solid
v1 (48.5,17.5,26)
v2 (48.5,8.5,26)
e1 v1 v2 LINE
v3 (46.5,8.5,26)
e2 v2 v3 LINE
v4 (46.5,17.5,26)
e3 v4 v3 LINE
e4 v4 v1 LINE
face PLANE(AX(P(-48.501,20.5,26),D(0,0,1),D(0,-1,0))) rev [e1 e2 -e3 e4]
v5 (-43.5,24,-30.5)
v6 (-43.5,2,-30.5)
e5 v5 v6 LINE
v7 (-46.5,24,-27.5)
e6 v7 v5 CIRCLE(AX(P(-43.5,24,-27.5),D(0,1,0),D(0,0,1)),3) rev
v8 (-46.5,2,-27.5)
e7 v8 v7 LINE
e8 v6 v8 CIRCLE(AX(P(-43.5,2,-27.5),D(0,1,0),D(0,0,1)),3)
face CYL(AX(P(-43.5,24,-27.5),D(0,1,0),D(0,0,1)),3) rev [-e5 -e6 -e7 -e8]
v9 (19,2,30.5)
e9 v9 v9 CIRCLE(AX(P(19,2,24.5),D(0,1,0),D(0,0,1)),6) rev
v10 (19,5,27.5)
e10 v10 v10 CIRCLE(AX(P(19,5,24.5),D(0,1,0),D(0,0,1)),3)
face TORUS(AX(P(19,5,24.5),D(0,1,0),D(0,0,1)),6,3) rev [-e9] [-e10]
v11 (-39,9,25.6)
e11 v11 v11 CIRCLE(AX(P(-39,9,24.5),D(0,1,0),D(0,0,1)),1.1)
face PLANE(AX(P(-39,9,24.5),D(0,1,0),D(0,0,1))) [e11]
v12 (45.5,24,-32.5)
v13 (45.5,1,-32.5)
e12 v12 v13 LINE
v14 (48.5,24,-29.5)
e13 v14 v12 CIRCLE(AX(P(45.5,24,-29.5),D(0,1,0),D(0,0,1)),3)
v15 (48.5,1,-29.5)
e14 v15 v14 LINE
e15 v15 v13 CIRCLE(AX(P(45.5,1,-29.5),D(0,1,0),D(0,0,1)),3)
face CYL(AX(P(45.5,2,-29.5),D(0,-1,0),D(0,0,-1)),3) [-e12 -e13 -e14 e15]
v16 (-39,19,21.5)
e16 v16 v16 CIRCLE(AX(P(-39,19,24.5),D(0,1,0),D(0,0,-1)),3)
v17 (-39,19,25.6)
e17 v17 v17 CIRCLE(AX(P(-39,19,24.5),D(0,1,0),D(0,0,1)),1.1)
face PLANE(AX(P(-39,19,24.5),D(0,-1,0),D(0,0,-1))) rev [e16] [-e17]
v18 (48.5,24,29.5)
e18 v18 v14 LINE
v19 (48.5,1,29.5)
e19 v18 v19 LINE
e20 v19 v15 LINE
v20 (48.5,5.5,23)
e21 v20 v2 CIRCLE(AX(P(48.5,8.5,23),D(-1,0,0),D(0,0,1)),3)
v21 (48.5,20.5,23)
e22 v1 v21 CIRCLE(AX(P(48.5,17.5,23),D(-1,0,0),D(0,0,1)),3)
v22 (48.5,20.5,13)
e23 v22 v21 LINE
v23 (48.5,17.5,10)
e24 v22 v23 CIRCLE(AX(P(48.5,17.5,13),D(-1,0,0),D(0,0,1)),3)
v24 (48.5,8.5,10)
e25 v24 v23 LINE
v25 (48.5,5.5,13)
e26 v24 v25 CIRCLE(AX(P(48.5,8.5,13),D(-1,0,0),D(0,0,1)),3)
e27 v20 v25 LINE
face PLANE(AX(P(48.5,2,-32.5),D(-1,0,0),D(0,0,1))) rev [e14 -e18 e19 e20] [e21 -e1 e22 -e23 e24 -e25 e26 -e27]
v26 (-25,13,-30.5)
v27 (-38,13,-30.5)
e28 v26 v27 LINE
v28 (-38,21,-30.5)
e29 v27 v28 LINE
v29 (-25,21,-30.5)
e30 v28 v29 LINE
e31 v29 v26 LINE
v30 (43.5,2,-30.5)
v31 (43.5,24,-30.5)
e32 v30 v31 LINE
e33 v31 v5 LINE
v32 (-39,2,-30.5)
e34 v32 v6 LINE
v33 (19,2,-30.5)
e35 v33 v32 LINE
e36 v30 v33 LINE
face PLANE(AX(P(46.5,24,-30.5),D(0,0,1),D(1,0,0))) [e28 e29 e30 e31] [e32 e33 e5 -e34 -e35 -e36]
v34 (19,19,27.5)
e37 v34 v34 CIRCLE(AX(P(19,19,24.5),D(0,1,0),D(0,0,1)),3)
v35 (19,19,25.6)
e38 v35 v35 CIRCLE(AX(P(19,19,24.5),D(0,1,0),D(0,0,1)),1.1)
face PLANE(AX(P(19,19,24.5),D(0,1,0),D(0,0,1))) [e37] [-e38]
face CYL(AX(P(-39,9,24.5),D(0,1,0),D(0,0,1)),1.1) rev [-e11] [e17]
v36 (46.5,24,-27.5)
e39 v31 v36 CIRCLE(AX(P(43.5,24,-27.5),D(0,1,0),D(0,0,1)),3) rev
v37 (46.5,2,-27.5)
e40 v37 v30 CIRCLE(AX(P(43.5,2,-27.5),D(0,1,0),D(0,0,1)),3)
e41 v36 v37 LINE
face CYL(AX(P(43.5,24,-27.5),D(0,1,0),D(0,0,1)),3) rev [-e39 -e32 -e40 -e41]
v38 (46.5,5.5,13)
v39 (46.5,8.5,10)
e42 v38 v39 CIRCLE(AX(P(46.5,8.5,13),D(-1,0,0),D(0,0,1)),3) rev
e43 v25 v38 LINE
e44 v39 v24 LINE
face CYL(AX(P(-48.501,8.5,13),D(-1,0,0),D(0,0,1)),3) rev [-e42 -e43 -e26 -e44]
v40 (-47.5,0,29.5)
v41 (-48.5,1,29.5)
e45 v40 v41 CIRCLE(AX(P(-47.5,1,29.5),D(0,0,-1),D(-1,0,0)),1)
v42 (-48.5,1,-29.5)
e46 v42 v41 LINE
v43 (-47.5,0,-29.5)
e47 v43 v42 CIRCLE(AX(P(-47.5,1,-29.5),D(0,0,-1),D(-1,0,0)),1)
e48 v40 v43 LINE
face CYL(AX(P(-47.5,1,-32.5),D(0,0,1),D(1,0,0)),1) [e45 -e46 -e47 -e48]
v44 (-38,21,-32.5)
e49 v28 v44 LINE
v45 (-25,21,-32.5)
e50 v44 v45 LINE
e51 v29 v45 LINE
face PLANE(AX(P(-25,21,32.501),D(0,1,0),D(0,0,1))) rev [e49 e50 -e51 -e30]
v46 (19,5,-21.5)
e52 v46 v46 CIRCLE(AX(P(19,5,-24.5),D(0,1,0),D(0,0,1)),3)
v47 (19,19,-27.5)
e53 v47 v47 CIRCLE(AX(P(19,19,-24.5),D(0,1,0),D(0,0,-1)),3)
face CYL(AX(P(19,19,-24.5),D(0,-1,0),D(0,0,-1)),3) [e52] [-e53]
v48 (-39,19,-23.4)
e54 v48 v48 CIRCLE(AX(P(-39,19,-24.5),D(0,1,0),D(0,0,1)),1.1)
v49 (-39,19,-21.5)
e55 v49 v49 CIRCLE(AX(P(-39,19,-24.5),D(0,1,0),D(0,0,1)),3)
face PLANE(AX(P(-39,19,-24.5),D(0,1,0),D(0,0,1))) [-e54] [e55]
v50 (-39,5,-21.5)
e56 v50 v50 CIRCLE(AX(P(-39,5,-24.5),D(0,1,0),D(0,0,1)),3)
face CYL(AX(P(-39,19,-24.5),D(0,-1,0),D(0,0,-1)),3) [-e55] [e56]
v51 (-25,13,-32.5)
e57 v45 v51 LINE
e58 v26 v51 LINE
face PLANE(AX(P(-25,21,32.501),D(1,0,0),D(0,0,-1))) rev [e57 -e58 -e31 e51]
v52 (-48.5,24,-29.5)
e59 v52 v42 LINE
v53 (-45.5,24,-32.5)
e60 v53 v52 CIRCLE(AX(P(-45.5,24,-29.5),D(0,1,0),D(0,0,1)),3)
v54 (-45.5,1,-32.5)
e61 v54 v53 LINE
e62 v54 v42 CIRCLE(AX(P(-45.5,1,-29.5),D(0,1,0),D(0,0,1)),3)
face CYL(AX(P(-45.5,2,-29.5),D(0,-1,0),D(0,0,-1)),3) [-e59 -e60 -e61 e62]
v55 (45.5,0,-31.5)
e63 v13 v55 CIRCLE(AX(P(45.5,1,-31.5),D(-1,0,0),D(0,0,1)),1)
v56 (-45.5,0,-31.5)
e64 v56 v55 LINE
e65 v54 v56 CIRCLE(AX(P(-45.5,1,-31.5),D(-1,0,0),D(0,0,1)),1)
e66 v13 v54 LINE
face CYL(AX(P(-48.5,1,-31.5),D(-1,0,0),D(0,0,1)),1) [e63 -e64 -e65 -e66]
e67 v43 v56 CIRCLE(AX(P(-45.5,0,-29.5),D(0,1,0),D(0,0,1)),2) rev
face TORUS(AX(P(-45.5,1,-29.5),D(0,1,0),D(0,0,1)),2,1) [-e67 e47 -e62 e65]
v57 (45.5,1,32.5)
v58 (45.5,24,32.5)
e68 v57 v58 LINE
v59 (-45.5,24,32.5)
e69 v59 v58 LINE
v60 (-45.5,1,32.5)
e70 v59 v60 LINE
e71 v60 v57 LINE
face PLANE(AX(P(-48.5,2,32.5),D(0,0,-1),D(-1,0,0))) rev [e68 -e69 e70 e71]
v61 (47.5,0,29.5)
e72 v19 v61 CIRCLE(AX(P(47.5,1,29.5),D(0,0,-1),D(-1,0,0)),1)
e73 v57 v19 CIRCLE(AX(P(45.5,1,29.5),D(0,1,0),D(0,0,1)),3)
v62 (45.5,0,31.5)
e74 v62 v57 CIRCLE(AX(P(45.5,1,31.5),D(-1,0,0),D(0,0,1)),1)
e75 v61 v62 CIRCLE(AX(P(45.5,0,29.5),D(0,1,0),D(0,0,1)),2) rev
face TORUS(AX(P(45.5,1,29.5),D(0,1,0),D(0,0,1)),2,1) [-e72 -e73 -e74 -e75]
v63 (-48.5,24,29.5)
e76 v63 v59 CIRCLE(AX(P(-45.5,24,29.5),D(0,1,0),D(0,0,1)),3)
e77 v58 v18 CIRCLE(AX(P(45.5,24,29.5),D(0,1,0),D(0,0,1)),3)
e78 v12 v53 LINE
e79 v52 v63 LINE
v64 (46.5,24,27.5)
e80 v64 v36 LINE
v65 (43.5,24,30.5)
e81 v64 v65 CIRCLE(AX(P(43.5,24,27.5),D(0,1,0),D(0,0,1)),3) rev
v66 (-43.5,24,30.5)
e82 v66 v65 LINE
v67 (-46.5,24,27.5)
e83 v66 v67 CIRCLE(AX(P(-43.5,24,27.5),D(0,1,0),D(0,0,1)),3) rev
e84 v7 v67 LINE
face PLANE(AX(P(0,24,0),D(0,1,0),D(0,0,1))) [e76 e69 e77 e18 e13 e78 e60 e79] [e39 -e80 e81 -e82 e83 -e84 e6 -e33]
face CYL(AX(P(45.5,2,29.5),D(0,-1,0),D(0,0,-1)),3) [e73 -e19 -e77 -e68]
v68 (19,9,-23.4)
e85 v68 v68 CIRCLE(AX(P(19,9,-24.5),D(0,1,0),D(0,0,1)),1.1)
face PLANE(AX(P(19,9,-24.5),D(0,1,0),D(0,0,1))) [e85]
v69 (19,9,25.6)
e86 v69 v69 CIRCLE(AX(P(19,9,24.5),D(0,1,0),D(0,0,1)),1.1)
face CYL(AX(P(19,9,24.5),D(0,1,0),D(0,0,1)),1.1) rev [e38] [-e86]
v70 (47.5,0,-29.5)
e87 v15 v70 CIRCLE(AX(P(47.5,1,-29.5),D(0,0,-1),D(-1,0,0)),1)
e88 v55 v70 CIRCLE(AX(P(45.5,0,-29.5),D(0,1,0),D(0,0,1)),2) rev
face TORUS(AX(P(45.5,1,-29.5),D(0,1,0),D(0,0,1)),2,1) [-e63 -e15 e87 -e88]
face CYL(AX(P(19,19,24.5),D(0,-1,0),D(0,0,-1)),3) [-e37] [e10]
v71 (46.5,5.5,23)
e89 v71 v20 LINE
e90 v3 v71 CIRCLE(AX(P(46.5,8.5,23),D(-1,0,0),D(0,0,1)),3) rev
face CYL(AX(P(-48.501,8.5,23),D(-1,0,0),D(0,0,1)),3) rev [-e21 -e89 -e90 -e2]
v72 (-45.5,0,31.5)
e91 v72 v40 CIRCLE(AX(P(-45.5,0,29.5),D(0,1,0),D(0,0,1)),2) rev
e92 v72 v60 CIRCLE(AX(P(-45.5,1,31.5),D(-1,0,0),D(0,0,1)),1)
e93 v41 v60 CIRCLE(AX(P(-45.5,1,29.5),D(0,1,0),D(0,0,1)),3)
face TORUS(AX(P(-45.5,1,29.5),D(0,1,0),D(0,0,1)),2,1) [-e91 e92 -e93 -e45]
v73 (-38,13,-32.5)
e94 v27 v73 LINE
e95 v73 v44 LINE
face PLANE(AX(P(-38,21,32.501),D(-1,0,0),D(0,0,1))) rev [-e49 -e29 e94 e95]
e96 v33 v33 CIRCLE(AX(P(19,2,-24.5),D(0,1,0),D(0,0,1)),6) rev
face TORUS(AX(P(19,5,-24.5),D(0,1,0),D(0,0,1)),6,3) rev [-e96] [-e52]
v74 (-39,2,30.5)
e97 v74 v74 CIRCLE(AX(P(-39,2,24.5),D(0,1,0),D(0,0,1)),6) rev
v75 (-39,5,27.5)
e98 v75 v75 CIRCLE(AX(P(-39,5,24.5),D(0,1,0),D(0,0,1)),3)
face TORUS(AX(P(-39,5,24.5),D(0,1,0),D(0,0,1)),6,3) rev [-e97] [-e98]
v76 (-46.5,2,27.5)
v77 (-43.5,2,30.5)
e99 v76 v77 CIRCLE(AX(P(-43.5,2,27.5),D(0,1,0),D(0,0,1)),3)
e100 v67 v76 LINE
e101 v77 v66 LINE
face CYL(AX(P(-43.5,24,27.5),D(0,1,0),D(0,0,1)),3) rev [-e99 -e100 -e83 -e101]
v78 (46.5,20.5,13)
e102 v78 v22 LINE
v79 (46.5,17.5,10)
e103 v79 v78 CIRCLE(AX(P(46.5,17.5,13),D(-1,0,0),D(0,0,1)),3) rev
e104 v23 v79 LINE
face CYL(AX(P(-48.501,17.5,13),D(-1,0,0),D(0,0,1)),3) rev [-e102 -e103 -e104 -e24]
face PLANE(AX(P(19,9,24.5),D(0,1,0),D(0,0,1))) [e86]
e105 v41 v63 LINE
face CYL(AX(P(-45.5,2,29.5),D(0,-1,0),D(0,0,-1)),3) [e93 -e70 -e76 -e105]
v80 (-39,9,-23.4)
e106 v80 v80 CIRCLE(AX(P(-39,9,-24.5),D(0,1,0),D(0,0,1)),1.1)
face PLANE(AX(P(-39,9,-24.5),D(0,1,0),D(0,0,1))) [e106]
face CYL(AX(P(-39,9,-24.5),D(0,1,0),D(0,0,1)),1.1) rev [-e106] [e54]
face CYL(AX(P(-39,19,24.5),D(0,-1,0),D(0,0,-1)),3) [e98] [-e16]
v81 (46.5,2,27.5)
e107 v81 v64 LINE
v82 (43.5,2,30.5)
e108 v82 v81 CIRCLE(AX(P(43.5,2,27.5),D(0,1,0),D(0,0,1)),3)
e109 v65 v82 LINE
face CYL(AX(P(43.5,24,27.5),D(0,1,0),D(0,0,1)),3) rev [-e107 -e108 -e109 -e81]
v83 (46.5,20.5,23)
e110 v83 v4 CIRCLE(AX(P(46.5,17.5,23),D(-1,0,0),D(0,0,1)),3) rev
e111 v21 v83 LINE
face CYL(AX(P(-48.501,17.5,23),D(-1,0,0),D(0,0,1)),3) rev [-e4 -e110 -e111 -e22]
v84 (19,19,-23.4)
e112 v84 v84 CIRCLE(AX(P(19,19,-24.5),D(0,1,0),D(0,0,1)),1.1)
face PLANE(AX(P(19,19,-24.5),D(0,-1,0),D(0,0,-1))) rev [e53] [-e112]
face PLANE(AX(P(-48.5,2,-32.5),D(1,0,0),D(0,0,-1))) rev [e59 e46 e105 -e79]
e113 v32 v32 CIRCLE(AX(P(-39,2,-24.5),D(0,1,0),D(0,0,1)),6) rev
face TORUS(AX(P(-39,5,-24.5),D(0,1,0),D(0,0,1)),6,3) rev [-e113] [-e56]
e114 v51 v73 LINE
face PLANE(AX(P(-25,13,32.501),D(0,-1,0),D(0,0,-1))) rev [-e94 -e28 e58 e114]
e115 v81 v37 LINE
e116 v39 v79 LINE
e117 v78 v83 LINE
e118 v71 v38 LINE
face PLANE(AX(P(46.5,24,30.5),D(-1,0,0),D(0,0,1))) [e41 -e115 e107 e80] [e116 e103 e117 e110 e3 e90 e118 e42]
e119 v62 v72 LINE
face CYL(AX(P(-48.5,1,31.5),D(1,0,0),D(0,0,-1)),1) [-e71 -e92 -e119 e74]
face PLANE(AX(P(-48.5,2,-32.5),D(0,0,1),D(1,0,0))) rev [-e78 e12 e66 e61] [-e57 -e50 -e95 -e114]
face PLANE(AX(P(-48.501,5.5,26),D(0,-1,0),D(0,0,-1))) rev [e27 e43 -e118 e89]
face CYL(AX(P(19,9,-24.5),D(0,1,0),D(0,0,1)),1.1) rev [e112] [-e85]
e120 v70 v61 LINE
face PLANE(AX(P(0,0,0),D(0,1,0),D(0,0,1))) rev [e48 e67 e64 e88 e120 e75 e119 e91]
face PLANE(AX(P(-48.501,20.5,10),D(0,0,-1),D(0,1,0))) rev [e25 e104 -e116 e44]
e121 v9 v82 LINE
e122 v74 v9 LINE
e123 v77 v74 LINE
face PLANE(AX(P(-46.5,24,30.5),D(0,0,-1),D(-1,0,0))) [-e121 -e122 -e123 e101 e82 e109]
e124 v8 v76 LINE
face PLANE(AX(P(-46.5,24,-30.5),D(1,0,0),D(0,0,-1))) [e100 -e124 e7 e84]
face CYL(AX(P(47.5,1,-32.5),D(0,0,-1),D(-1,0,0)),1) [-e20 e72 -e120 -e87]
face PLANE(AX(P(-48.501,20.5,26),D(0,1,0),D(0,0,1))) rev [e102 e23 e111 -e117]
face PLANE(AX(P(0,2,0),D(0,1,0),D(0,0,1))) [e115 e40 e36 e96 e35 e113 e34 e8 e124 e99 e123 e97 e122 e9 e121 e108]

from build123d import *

# Parameters (mm, degrees)
SKETCH1_W           = 97
SKETCH1_H           = 65
BOSS_EXTRUDE1_DEPTH = 2
SKETCH3_W           = 97
SKETCH3_H           = 65
SKETCH3_W_2         = 93
SKETCH3_H_2         = 61
BOSS_EXTRUDE2_DEPTH = 22
SKETCH4_R           = 3
BOSS_EXTRUDE3_DEPTH = 17
SKETCH5_R           = 1.1
CUT_EXTRUDE1_DEPTH  = 10
FILLET1_R           = 3
FILLET2_R           = 3
CUT_EXTRUDE2_REACH  = 107.077
SKETCH6_W           = 16
SKETCH6_H           = 15
FILLET3_R           = 3
CUT_EXTRUDE3_REACH  = 86.577
SKETCH7_W           = 13
SKETCH7_H           = 8
FILLET4_R           = 1


with BuildPart() as part:
    # Sketch1 → Boss-Extrude1 (new body)
    with BuildSketch(Plane(origin=(0, 0, 0), x_dir=(1, 0, 0), z_dir=(0, 1, 0))):
        Rectangle(SKETCH1_W, SKETCH1_H)
    extrude(amount=BOSS_EXTRUDE1_DEPTH)

    # Sketch3 → Boss-Extrude2 (add)
    with BuildSketch(Plane(origin=(0, 2, 0), x_dir=(1, 0, 0), z_dir=(0, 1, 0))):
        Rectangle(SKETCH3_W, SKETCH3_H)
        Rectangle(SKETCH3_W_2, SKETCH3_H_2, mode=Mode.SUBTRACT)
    extrude(amount=BOSS_EXTRUDE2_DEPTH)

    # Sketch4 → Boss-Extrude3 (add)
    with BuildSketch(Plane(origin=(0, 2, 0), x_dir=(1, 0, 0), z_dir=(0, 1, 0))):
        with Locations(Location((-39, 24.5, 0), (0, 0, 270))):
            Circle(SKETCH4_R)
        with Locations(Location((-39, -24.5, 0), (0, 0, 90))):
            Circle(SKETCH4_R)
        with Locations(Location((19, -24.5, 0), (0, 0, 270))):
            Circle(SKETCH4_R)
        with Locations(Location((19, 24.5, 0), (0, 0, 90))):
            Circle(SKETCH4_R)
    extrude(amount=BOSS_EXTRUDE3_DEPTH)

    # Sketch5 → Cut-Extrude1 (cut)
    with BuildSketch(Plane(origin=(0, 19, 0), x_dir=(1, 0, 0), z_dir=(0, 1, 0))):
        with Locations(Location((-39, 24.5, 0), (0, 0, 270))):
            Circle(SKETCH5_R)
        with Locations(Location((19, 24.5, 0), (0, 0, 270))):
            Circle(SKETCH5_R)
        with Locations(Location((19, -24.5, 0), (0, 0, 270))):
            Circle(SKETCH5_R)
        with Locations(Location((-39, -24.5, 0), (0, 0, 270))):
            Circle(SKETCH5_R)
    extrude(amount=-CUT_EXTRUDE1_DEPTH, mode=Mode.SUBTRACT)

    # Fillet1
    fillet1_edges = [part.edges().sort_by_distance(p)[0] for p in [
        (-39, 2, -27.5),
        (-39, 2, 27.5),
        (19, 2, 21.5),
        (19, 2, -21.5),
    ]]
    fillet(fillet1_edges, radius=FILLET1_R - 0.0001)  # a hair under: the kernel refuses the full size

    # Fillet2
    fillet2_edges = [part.edges().sort_by_distance(p)[0] for p in [
        (46.5, 13, -30.5),
        (-46.5, 13, -30.5),
        (-46.5, 13, 30.5),
        (46.5, 13, 30.5),
        (48.5, 12, 32.5),
        (-48.5, 12, 32.5),
        (-48.5, 12, -32.5),
        (48.5, 12, -32.5),
    ]]
    fillet(fillet2_edges, radius=FILLET2_R)

    # Sketch6 → Cut-Extrude2 (cut, up to next)
    with BuildSketch(Plane(origin=(48.5, 0, 0), x_dir=(0, 0, -1), z_dir=(1, 0, 0)), mode=Mode.PRIVATE) as cut_extrude2_sk1:
        with Locations((-18, 13)):
            Rectangle(SKETCH6_W, SKETCH6_H)
    cut_extrude2_tool1 = extrude(cut_extrude2_sk1.sketch, amount=-CUT_EXTRUDE2_REACH, mode=Mode.PRIVATE) & part.part
    add(cut_extrude2_tool1.solids().sort_by_distance((48.5, 13, 18))[0], mode=Mode.SUBTRACT)

    # Fillet3
    fillet3_edges = [part.edges().sort_by_distance(p)[0] for p in [
        (47.5, 20.5, 26),
        (47.5, 5.5, 26),
        (47.5, 5.5, 10),
        (47.5, 20.5, 10),
    ]]
    fillet(fillet3_edges, radius=FILLET3_R)

    # Sketch7 → Cut-Extrude3 (cut, up to next)
    with BuildSketch(Plane(origin=(0, 0, -32.5), x_dir=(-1, 0, 0), z_dir=(0, 0, -1)), mode=Mode.PRIVATE) as cut_extrude3_sk1:
        with Locations((31.5, 17)):
            Rectangle(SKETCH7_W, SKETCH7_H)
    cut_extrude3_tool1 = extrude(cut_extrude3_sk1.sketch, amount=-CUT_EXTRUDE3_REACH, mode=Mode.PRIVATE) & part.part
    add(cut_extrude3_tool1.solids().sort_by_distance((-31.5, 17, -32.5))[0], mode=Mode.SUBTRACT)

    # Fillet4
    fillet4_edges = [part.edges().sort_by_distance(p)[0] for p in [
        (0, 0, -32.5),
        (48.5, 0, 0),
        (0, 0, 32.5),
        (-48.5, 0, 0),
        (-47.621320344, 0, -31.621320344),
        (-47.621320344, 0, 31.621320344),
        (47.621320344, 0, 31.621320344),
        (47.621320344, 0, -31.621320344),
    ]]
    fillet(fillet4_edges, radius=FILLET4_R)


solid = part.part
